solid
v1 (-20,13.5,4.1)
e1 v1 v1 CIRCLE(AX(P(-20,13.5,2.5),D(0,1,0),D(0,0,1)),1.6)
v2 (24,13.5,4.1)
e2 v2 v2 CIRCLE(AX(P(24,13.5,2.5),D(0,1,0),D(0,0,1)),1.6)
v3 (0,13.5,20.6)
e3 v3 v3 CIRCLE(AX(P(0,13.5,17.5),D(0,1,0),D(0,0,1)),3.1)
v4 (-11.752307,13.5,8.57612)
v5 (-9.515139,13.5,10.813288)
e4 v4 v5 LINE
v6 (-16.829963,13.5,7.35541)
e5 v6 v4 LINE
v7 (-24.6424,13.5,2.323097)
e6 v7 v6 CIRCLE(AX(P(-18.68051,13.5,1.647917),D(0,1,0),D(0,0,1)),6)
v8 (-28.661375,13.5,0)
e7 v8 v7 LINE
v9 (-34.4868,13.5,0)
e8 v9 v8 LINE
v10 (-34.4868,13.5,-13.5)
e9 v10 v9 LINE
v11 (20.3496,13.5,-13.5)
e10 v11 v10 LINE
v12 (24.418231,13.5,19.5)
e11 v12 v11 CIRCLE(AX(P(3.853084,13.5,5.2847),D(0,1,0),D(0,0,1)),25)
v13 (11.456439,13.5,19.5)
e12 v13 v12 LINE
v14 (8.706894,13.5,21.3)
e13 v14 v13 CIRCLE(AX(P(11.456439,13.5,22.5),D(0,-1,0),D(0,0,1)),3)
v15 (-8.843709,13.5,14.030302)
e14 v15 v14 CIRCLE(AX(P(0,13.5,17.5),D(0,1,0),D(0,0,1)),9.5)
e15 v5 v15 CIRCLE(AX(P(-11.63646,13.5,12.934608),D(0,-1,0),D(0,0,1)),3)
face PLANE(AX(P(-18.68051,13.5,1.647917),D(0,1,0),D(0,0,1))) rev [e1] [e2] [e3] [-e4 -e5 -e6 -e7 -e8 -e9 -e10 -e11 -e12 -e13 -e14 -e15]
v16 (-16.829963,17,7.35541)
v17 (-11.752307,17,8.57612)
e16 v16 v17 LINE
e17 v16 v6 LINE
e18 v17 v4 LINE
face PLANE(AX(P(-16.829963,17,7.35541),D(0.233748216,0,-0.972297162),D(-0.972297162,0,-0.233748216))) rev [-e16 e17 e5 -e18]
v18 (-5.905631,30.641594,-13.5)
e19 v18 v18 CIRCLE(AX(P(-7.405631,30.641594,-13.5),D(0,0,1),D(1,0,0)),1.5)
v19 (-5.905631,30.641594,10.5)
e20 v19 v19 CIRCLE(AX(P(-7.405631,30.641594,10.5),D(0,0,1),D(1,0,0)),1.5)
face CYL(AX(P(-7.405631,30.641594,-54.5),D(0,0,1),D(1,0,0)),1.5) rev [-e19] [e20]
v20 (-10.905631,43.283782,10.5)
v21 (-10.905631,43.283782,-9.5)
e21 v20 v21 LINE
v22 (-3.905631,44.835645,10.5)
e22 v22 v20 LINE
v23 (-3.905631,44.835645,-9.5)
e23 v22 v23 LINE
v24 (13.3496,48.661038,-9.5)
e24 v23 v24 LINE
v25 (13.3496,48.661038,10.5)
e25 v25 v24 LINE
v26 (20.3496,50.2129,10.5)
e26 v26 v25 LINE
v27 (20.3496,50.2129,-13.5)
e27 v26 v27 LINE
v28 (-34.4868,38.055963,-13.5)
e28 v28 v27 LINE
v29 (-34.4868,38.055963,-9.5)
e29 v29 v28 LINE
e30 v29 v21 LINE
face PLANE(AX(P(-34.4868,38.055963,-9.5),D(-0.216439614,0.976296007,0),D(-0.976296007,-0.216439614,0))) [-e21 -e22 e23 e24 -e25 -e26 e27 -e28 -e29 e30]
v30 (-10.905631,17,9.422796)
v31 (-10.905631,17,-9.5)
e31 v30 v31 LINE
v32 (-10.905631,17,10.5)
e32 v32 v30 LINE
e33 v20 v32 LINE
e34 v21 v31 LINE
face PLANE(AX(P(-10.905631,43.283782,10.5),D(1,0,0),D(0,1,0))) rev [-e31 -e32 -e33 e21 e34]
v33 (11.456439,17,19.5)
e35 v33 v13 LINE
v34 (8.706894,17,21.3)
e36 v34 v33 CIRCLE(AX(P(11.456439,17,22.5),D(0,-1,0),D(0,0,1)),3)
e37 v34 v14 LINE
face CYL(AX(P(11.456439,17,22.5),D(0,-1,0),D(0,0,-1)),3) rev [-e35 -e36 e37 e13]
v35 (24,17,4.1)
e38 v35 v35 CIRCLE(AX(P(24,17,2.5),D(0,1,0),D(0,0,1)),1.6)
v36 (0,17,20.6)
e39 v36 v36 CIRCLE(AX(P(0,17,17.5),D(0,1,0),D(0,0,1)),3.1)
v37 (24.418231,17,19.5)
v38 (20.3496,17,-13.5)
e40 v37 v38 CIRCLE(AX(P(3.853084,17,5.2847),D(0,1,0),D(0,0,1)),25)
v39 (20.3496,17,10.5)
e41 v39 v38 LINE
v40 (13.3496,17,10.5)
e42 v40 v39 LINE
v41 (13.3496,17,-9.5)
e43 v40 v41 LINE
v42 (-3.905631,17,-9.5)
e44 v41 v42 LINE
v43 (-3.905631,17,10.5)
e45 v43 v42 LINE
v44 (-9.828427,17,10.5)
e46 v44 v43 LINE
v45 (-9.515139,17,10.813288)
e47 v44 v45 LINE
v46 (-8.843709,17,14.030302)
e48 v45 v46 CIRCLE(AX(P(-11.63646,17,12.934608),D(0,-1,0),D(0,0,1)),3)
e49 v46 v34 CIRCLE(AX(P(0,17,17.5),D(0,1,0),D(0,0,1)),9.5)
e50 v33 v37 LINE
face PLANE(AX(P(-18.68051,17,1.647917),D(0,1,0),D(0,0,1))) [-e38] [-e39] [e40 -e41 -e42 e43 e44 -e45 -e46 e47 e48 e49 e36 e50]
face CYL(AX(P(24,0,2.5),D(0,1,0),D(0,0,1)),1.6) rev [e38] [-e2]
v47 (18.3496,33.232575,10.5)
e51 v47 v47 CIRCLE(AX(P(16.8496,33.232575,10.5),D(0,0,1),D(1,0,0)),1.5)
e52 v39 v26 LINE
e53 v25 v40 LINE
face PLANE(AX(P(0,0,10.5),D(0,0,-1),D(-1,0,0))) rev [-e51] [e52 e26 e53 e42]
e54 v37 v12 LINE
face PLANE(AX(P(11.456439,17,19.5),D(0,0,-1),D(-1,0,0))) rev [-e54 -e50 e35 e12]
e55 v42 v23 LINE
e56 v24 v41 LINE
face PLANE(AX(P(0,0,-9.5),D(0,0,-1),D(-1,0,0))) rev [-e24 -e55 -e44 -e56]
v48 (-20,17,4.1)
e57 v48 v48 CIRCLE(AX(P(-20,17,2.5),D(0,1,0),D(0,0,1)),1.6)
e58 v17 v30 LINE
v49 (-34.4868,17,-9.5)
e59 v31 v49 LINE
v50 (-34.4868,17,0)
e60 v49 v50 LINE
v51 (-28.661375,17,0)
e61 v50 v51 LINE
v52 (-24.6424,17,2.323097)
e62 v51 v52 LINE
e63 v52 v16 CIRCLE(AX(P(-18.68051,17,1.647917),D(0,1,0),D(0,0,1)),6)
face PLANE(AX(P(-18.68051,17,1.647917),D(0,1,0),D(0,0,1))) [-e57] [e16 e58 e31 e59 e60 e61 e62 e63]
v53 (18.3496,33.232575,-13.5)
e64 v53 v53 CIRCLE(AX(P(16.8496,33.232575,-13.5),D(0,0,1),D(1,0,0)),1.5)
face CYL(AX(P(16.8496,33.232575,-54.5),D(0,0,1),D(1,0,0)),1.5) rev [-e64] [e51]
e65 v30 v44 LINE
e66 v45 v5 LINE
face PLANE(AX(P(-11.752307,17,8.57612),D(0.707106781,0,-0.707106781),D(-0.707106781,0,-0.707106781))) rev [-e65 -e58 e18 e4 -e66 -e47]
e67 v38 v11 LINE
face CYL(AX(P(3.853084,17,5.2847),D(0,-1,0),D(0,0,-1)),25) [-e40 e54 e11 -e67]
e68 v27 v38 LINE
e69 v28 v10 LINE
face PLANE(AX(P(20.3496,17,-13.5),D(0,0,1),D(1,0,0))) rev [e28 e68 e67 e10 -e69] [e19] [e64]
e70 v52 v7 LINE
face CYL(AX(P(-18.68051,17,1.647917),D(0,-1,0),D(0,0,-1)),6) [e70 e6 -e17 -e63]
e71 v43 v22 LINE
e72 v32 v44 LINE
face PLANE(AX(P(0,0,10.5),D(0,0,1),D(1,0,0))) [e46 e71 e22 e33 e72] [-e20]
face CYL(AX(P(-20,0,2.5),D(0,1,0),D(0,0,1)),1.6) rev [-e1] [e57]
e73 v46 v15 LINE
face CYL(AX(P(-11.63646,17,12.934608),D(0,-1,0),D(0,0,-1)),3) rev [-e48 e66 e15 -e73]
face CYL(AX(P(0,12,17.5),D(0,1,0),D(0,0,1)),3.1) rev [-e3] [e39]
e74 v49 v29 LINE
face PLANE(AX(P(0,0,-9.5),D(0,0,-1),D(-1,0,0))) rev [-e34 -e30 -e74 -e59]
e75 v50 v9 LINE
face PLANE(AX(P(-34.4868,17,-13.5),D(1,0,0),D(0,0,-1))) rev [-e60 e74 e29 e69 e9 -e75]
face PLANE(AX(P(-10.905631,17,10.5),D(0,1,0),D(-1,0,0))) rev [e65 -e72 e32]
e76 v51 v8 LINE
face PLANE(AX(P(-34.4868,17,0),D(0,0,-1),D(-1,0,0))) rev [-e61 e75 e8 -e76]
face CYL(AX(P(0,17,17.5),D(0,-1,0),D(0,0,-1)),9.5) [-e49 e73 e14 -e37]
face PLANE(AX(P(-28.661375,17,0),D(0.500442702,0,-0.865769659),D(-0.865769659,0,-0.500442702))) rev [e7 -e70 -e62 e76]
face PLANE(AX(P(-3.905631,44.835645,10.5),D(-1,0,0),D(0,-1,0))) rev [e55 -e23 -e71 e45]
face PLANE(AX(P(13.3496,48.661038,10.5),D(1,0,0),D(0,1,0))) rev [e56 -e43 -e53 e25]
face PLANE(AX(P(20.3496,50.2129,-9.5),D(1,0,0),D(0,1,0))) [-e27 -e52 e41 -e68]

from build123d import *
from build123d.topology import SkipClean

# Parameters (mm, degrees)
CROQUIS1_W              = 70
CROQUIS1_H              = 65
EXTRUIR1_DEPTH          = 3.5
CROQUIS2_R              = 3.1
EXTRUIR2_DEPTH          = 5
EXTRUIR3_DEPTH          = 10
CROQUIS4_OUTSIDE_W      = 91.294
CROQUIS4_OUTSIDE_H      = 86.294
EXTRUIR4_DEPTH          = 10
REDONDEO1_R             = 3
EXTRUIR5_DEPTH          = 13.5
EXTRUIR6_DEPTH          = 3.5
CROQUIS7_R              = 1.6
EXTRUIR7_DEPTH          = 47.982330447
CROQUIS8_R              = 3.1
EXTRUIR8_DEPTH          = 5
CROQUIS9_W              = 0.7
CROQUIS9_H              = 10.5
EXTRUIR9_DEPTH          = 10
EXTRUIR10_DEPTH         = 63.752948337
EXTRUIR10_DEPTH_BACK    = 10
CROQUIS10_W             = 3.0625
CROQUIS10_H             = 5
SALIENTE_EXTRUIR1_DEPTH = 4
SALIENTE_EXTRUIR2_DEPTH = 20
CROQUIS14_R             = 1.5
CORTAR_EXTRUIR2_DEPTH   = 65


with BuildPart() as part:
    # Croquis1 → Extruir1 (new body)
    with BuildSketch(Plane(origin=(0, 0, 0), x_dir=(1, 0, 0), z_dir=(0, 1, 0))):
        Rectangle(CROQUIS1_W, CROQUIS1_H)
    extrude(amount=EXTRUIR1_DEPTH)

    # Croquis2 → Extruir2 (cut)
    with BuildSketch(Plane(origin=(0, 3.5, 0), x_dir=(1, 0, 0), z_dir=(0, 1, 0))):
        with Locations(Location((0, -17.5, 0), (0, 0, 270))):
            Circle(CROQUIS2_R)
    extrude(amount=-EXTRUIR2_DEPTH, mode=Mode.SUBTRACT)

    # Croquis3 → Extruir3 (add)
    with BuildSketch(Plane(origin=(0, 3.5, 0), x_dir=(1, 0, 0), z_dir=(0, 1, 0))):
        with BuildLine():
            Line((-34.4868, 13.5), (20.3496, 13.5))
            Line((20.3496, 13.5), (20.3496, 0))
            Line((20.3496, 0), (17.146428199, 0))
            ThreePointArc((17.146428199, 0), (22.955777517, -8.939493087), (24.418230894, -19.5))
            Line((24.418230894, -19.5), (9.287087811, -19.5))
            ThreePointArc((9.287087811, -19.5), (-3.635492607, -26.276855559), (-7.981176331, -12.347250794))
            Line((-7.981176331, -12.347250794), (-18.680510212, -1.647916913))
            ThreePointArc((-18.680510212, -1.647916913), (-17.932408832, -0.806327142), (-17.146428199, 0))
            Line((-17.146428199, 0), (-34.4868, 0))
            Line((-34.4868, 0), (-34.4868, 13.5))
        make_face()
        with BuildLine():
            Line((-32.9868, 1.5), (-12.961481397, 1.5))
            ThreePointArc((-12.961481397, 1.5), (-14.868021343, 0.048274597), (-16.613165932, -1.593940849))
            Line((-16.613165932, -1.593940849), (-5.999348286, -12.207758495))
            ThreePointArc((-5.999348286, -12.207758495), (-3.061467459, -24.89103626), (7.984359711, -18))
            Line((7.984359711, -18), (22.994564575, -18))
            ThreePointArc((22.994564575, -18), (20.451694563, -6.977253708), (12.961481397, 1.5))
            Line((12.961481397, 1.5), (18.8496, 1.5))
            Line((18.8496, 1.5), (18.8496, 12))
            Line((18.8496, 12), (-32.9868, 12))
            Line((-32.9868, 12), (-32.9868, 1.5))
        make_face(mode=Mode.SUBTRACT)
    extrude(amount=EXTRUIR3_DEPTH)

    # Croquis4 outside → Extruir4 (cut)
    with SkipClean():  # the faces are left unmerged after this step: merging them gives an invalid solid
        with BuildSketch(Plane(origin=(0, 3.5, 0), x_dir=(1, 0, 0), z_dir=(0, 1, 0))):
            Rectangle(CROQUIS4_OUTSIDE_W, CROQUIS4_OUTSIDE_H)
            with BuildLine():
                Line((-34.4868, 0), (-17.146428199, 0))
                ThreePointArc((-17.146428199, 0), (-17.932408832, -0.806327142), (-18.680510212, -1.647916913))
                Line((-18.680510212, -1.647916913), (-7.981176331, -12.347250794))
                ThreePointArc((-7.981176331, -12.347250794), (-3.635492607, -26.276855559), (9.287087811, -19.5))
                Line((9.287087811, -19.5), (24.418230894, -19.5))
                ThreePointArc((24.418230894, -19.5), (22.955777517, -8.939493087), (17.146428199, 0))
                Line((17.146428199, 0), (20.3496, 0))
                Line((20.3496, 0), (20.3496, 13.5))
                Line((20.3496, 13.5), (-34.4868, 13.5))
                Line((-34.4868, 13.5), (-34.4868, 0))
            make_face(mode=Mode.SUBTRACT)
        extrude(amount=-EXTRUIR4_DEPTH, mode=Mode.SUBTRACT)

    # Redondeo1
    redondeo1_edges = [part.edges().sort_by_distance(p)[0] for p in [
        (-7.981176331, 8.5, 12.347250794),
        (9.287087811, 8.5, 19.5),
        (-5.999348286, 8.5, 12.207758495),
        (7.984359711, 8.5, 18),
    ]]
    fillet(redondeo1_edges, radius=REDONDEO1_R)

    # Croquis5 → Extruir5 (add)
    with SkipClean():  # the faces are left unmerged after this step: merging them gives an invalid solid
        with BuildSketch(Plane.XZ):
            with BuildLine():
                Line((-18.680510212, 1.647916913), (-14.437869525, 5.8905576))
                ThreePointArc((-14.437869525, 5.8905576), (-21.723092903, 6.819250451), (-24.449770984, 0))
                Line((-24.449770984, 0), (-17.146428199, 0))
                ThreePointArc((-17.146428199, 0), (-17.932408832, 0.806327142), (-18.680510212, 1.647916913))
            make_face()
            with BuildLine():
                Line((20.3496, 0), (20.3496, -13.5))
                ThreePointArc((20.3496, -13.5), (28.665212431, 2.225567304), (24.418230894, 19.5))
                ThreePointArc((24.418230894, 19.5), (22.955777517, 8.939493087), (17.146428199, 0))
                Line((17.146428199, 0), (20.3496, 0))
            make_face()
        extrude(amount=-EXTRUIR5_DEPTH)

    # Chaflán1
    # the kernel refuses this chamfer: 5, 4.044665138 mm, written as the material it adds along each edge
    with BuildSketch(Plane(origin=(-14.437869525, 3.5, 5.8905576), x_dir=(-0.8768595348589333, 0, 0.4807466652270976), z_dir=(0, 1, 0))) as chafl_n1_piece_1:
        with BuildLine():
            Line((2.949791971, 0), (-1.211824758, 3.780414953))
            Line((-1.211824758, 3.780414953), (-1.307822013, 3.752405544))
            ThreePointArc((-1.307822013, 3.752405544), (-0.651776703, 1.876825504), (-0.095997255, -0.02800941))
            Line((-0.095997255, -0.02800941), (0.02800941, -0.095997255))
            ThreePointArc((0.02800941, -0.095997255), (1.47002525, 0.136406993), (2.931105495, -0.098238565))
            Line((2.931105495, -0.098238565), (2.949791971, 0))
        make_face()
    extrude(amount=10)
    with BuildSketch(Plane(origin=(-24.449770984, 3.5, 0), x_dir=(-0.008036803743584595, 0, 0.9999677043712897), z_dir=(0, 1, 0))) as chafl_n1_piece_2:
        with BuildLine():
            Line((2.423263449, 0), (-0.064845869, -4.38542071))
            Line((-0.064845869, -4.38542071), (-0.164842639, -4.386224391))
            ThreePointArc((-0.164842639, -4.386224391), (-0.082377051, -2.193111839), (-0.09999677, -0.00080368))
            Line((-0.09999677, -0.00080368), (0.026691621, 0.096371974))
            ThreePointArc((0.026691621, 0.096371974), (1.204598314, -0.104316531), (2.411212242, 0.099271186))
            Line((2.411212242, 0.099271186), (2.423263449, 0))
        make_face()
    extrude(amount=10)
    with BuildSketch(Plane(origin=(-24.449770984, 0, 0), x_dir=(-0.9997395779240649, 0, -0.022820524363231526), z_dir=(0, 1, 0))) as chafl_n1_piece_3:
        with BuildLine():
            Line((4.385900112, 0), (-0.035828136, 2.422998574))
            Line((-0.035828136, 2.422998574), (-0.134910293, 2.409480951))
            ThreePointArc((-0.134910293, 2.409480951), (0.08649505, 1.206008973), (-0.096756078, 0.025263837))
            Line((-0.096756078, 0.025263837), (0.002282052, -0.099973958))
            ThreePointArc((0.002282052, -0.099973958), (2.194090072, -0.04994272), (4.388182164, -0.099973958))
            Line((4.388182164, -0.099973958), (4.385900112, 0))
        make_face()
    extrude(amount=3.5)
    with BuildSketch(Plane(origin=(-14.437869525, 0, 5.8905576), x_dir=(0.7254657554746632, 0, 0.6882582637597433), z_dir=(0, 1, 0))) as chafl_n1_piece_4:
        with BuildLine():
            Line((3.96989376, 0), (-0.900434913, -2.809001538))
            Line((-0.900434913, -2.809001538), (-0.98828054, -2.761219262))
            ThreePointArc((-0.98828054, -2.761219262), (-0.318834214, -1.441501248), (-0.099965384, 0.002630967))
            Line((-0.099965384, 0.002630967), (0.002630967, 0.099965384))
            ThreePointArc((0.002630967, 0.099965384), (1.986203869, 0.047760165), (3.972524727, 0.099965384))
            Line((3.972524727, 0.099965384), (3.96989376, 0))
        make_face()
    extrude(amount=3.5)


with BuildPart() as body_2:
    # Croquis6 → Extruir6 (new body)
    with BuildSketch(Plane(origin=(0, 13.5, 0), x_dir=(1, 0, 0), z_dir=(0, 1, 0))):
        with BuildLine():
            Line((-34.4868, 13.5), (-34.4868, 0))
            Line((-34.4868, 0), (-28.661374979, 0))
            Line((-28.661374979, 0), (-24.642400208, -2.323096648))
            ThreePointArc((-24.642400208, -2.323096648), (-21.929637735, -6.692039268), (-16.829963308, -7.355409896))
            Line((-16.829963308, -7.355409896), (-11.752306982, -8.576120143))
            Line((-11.752306982, -8.576120143), (-9.515139435, -10.813287689))
            ThreePointArc((-9.515139435, -10.813287689), (-8.69974084, -12.321679102), (-8.843709432, -14.030302105))
            ThreePointArc((-8.843709432, -14.030302105), (-3.635492607, -26.276855559), (8.70689382, -21.3))
            ThreePointArc((8.70689382, -21.3), (9.813271565, -19.99001992), (11.456439237, -19.5))
            Line((11.456439237, -19.5), (24.418230894, -19.5))
            ThreePointArc((24.418230894, -19.5), (28.665212431, -2.225567304), (20.3496, 13.5))
            Line((20.3496, 13.5), (-34.4868, 13.5))
        make_face()
    extrude(amount=EXTRUIR6_DEPTH)


with BuildPart() as extruir7_tool:
    # Croquis7 → Extruir7 (new, through all)
    with BuildSketch(Plane(origin=(0, 17, 0), x_dir=(1, 0, 0), z_dir=(0, 1, 0))):
        with Locations(Location((-20, -2.5, 0), (0, 0, 270))):
            Circle(CROQUIS7_R)
        with Locations(Location((24, -2.5, 0), (0, 0, 270))):
            Circle(CROQUIS7_R)
    extrude(amount=-EXTRUIR7_DEPTH)


with BuildPart() as part_1:
    add(part.part)

    # Extruir7: cut by extruir7_tool
    add(extruir7_tool.part, mode=Mode.SUBTRACT)

    # Croquis9 → Extruir9 (cut)
    with BuildSketch(Plane(origin=(0, 13.5, 0), x_dir=(1, 0, 0), z_dir=(0, 1, 0))):
        with Locations((19.1996, 6.75)):
            Rectangle(CROQUIS9_W, CROQUIS9_H)
    extrude(amount=-EXTRUIR9_DEPTH, mode=Mode.SUBTRACT)

    # Croquis10 → Extruir10 (cut, two sides: drawn at the far end of the back side and taken through both)
    with BuildSketch(Plane.ZY.offset(-19.5496).offset(-EXTRUIR10_DEPTH_BACK)):
        with Locations((-8.9375, 8.5)):
            Rectangle(CROQUIS10_W, CROQUIS10_H)
    extrude(amount=EXTRUIR10_DEPTH + EXTRUIR10_DEPTH_BACK, mode=Mode.SUBTRACT)


with BuildPart() as body_2_1:
    add(body_2.part)

    # Extruir7: cut by extruir7_tool
    add(extruir7_tool.part, mode=Mode.SUBTRACT)

    # Croquis8 → Extruir8 (cut)
    with BuildSketch(Plane(origin=(0, 17, 0), x_dir=(1, 0, 0), z_dir=(0, 1, 0))):
        with Locations(Location((0, -17.5, 0), (0, 0, 270))):
            Circle(CROQUIS8_R)
    extrude(amount=-EXTRUIR8_DEPTH, mode=Mode.SUBTRACT)

    # Croquis11 → Saliente-Extruir1 (add)
    with BuildSketch(Plane(origin=(0, 0, -13.5), x_dir=(-1, 0, 0), z_dir=(0, 0, -1))):
        Polygon((34.4868, 17), (34.4868, 38.05596306), (-20.3496, 50.212900258), (-20.3496, 17), align=None)
    extrude(amount=-SALIENTE_EXTRUIR1_DEPTH)

    # Croquis13 → Saliente-Extruir2 (add)
    with BuildSketch(Plane.XY.offset(-9.5)):
        Polygon((-10.905631326, 43.283782293), (-3.905631326, 44.835644932), (-3.905631326, 17), (-10.905631326, 17), align=None)
        Polygon((20.3496, 50.212900258), (13.3496, 48.66103762), (13.3496, 17), (20.3496, 17), align=None)
    extrude(amount=SALIENTE_EXTRUIR2_DEPTH)

    # Croquis14 → Cortar-Extruir2 (cut)
    with BuildSketch(Plane.XY.offset(10.5)):
        with Locations((-7.405631326, 30.64159382)):
            Circle(CROQUIS14_R)
        with Locations((16.8496, 33.23257477)):
            Circle(CROQUIS14_R)
    extrude(amount=-CORTAR_EXTRUIR2_DEPTH, mode=Mode.SUBTRACT)


solid = body_2_1.part
